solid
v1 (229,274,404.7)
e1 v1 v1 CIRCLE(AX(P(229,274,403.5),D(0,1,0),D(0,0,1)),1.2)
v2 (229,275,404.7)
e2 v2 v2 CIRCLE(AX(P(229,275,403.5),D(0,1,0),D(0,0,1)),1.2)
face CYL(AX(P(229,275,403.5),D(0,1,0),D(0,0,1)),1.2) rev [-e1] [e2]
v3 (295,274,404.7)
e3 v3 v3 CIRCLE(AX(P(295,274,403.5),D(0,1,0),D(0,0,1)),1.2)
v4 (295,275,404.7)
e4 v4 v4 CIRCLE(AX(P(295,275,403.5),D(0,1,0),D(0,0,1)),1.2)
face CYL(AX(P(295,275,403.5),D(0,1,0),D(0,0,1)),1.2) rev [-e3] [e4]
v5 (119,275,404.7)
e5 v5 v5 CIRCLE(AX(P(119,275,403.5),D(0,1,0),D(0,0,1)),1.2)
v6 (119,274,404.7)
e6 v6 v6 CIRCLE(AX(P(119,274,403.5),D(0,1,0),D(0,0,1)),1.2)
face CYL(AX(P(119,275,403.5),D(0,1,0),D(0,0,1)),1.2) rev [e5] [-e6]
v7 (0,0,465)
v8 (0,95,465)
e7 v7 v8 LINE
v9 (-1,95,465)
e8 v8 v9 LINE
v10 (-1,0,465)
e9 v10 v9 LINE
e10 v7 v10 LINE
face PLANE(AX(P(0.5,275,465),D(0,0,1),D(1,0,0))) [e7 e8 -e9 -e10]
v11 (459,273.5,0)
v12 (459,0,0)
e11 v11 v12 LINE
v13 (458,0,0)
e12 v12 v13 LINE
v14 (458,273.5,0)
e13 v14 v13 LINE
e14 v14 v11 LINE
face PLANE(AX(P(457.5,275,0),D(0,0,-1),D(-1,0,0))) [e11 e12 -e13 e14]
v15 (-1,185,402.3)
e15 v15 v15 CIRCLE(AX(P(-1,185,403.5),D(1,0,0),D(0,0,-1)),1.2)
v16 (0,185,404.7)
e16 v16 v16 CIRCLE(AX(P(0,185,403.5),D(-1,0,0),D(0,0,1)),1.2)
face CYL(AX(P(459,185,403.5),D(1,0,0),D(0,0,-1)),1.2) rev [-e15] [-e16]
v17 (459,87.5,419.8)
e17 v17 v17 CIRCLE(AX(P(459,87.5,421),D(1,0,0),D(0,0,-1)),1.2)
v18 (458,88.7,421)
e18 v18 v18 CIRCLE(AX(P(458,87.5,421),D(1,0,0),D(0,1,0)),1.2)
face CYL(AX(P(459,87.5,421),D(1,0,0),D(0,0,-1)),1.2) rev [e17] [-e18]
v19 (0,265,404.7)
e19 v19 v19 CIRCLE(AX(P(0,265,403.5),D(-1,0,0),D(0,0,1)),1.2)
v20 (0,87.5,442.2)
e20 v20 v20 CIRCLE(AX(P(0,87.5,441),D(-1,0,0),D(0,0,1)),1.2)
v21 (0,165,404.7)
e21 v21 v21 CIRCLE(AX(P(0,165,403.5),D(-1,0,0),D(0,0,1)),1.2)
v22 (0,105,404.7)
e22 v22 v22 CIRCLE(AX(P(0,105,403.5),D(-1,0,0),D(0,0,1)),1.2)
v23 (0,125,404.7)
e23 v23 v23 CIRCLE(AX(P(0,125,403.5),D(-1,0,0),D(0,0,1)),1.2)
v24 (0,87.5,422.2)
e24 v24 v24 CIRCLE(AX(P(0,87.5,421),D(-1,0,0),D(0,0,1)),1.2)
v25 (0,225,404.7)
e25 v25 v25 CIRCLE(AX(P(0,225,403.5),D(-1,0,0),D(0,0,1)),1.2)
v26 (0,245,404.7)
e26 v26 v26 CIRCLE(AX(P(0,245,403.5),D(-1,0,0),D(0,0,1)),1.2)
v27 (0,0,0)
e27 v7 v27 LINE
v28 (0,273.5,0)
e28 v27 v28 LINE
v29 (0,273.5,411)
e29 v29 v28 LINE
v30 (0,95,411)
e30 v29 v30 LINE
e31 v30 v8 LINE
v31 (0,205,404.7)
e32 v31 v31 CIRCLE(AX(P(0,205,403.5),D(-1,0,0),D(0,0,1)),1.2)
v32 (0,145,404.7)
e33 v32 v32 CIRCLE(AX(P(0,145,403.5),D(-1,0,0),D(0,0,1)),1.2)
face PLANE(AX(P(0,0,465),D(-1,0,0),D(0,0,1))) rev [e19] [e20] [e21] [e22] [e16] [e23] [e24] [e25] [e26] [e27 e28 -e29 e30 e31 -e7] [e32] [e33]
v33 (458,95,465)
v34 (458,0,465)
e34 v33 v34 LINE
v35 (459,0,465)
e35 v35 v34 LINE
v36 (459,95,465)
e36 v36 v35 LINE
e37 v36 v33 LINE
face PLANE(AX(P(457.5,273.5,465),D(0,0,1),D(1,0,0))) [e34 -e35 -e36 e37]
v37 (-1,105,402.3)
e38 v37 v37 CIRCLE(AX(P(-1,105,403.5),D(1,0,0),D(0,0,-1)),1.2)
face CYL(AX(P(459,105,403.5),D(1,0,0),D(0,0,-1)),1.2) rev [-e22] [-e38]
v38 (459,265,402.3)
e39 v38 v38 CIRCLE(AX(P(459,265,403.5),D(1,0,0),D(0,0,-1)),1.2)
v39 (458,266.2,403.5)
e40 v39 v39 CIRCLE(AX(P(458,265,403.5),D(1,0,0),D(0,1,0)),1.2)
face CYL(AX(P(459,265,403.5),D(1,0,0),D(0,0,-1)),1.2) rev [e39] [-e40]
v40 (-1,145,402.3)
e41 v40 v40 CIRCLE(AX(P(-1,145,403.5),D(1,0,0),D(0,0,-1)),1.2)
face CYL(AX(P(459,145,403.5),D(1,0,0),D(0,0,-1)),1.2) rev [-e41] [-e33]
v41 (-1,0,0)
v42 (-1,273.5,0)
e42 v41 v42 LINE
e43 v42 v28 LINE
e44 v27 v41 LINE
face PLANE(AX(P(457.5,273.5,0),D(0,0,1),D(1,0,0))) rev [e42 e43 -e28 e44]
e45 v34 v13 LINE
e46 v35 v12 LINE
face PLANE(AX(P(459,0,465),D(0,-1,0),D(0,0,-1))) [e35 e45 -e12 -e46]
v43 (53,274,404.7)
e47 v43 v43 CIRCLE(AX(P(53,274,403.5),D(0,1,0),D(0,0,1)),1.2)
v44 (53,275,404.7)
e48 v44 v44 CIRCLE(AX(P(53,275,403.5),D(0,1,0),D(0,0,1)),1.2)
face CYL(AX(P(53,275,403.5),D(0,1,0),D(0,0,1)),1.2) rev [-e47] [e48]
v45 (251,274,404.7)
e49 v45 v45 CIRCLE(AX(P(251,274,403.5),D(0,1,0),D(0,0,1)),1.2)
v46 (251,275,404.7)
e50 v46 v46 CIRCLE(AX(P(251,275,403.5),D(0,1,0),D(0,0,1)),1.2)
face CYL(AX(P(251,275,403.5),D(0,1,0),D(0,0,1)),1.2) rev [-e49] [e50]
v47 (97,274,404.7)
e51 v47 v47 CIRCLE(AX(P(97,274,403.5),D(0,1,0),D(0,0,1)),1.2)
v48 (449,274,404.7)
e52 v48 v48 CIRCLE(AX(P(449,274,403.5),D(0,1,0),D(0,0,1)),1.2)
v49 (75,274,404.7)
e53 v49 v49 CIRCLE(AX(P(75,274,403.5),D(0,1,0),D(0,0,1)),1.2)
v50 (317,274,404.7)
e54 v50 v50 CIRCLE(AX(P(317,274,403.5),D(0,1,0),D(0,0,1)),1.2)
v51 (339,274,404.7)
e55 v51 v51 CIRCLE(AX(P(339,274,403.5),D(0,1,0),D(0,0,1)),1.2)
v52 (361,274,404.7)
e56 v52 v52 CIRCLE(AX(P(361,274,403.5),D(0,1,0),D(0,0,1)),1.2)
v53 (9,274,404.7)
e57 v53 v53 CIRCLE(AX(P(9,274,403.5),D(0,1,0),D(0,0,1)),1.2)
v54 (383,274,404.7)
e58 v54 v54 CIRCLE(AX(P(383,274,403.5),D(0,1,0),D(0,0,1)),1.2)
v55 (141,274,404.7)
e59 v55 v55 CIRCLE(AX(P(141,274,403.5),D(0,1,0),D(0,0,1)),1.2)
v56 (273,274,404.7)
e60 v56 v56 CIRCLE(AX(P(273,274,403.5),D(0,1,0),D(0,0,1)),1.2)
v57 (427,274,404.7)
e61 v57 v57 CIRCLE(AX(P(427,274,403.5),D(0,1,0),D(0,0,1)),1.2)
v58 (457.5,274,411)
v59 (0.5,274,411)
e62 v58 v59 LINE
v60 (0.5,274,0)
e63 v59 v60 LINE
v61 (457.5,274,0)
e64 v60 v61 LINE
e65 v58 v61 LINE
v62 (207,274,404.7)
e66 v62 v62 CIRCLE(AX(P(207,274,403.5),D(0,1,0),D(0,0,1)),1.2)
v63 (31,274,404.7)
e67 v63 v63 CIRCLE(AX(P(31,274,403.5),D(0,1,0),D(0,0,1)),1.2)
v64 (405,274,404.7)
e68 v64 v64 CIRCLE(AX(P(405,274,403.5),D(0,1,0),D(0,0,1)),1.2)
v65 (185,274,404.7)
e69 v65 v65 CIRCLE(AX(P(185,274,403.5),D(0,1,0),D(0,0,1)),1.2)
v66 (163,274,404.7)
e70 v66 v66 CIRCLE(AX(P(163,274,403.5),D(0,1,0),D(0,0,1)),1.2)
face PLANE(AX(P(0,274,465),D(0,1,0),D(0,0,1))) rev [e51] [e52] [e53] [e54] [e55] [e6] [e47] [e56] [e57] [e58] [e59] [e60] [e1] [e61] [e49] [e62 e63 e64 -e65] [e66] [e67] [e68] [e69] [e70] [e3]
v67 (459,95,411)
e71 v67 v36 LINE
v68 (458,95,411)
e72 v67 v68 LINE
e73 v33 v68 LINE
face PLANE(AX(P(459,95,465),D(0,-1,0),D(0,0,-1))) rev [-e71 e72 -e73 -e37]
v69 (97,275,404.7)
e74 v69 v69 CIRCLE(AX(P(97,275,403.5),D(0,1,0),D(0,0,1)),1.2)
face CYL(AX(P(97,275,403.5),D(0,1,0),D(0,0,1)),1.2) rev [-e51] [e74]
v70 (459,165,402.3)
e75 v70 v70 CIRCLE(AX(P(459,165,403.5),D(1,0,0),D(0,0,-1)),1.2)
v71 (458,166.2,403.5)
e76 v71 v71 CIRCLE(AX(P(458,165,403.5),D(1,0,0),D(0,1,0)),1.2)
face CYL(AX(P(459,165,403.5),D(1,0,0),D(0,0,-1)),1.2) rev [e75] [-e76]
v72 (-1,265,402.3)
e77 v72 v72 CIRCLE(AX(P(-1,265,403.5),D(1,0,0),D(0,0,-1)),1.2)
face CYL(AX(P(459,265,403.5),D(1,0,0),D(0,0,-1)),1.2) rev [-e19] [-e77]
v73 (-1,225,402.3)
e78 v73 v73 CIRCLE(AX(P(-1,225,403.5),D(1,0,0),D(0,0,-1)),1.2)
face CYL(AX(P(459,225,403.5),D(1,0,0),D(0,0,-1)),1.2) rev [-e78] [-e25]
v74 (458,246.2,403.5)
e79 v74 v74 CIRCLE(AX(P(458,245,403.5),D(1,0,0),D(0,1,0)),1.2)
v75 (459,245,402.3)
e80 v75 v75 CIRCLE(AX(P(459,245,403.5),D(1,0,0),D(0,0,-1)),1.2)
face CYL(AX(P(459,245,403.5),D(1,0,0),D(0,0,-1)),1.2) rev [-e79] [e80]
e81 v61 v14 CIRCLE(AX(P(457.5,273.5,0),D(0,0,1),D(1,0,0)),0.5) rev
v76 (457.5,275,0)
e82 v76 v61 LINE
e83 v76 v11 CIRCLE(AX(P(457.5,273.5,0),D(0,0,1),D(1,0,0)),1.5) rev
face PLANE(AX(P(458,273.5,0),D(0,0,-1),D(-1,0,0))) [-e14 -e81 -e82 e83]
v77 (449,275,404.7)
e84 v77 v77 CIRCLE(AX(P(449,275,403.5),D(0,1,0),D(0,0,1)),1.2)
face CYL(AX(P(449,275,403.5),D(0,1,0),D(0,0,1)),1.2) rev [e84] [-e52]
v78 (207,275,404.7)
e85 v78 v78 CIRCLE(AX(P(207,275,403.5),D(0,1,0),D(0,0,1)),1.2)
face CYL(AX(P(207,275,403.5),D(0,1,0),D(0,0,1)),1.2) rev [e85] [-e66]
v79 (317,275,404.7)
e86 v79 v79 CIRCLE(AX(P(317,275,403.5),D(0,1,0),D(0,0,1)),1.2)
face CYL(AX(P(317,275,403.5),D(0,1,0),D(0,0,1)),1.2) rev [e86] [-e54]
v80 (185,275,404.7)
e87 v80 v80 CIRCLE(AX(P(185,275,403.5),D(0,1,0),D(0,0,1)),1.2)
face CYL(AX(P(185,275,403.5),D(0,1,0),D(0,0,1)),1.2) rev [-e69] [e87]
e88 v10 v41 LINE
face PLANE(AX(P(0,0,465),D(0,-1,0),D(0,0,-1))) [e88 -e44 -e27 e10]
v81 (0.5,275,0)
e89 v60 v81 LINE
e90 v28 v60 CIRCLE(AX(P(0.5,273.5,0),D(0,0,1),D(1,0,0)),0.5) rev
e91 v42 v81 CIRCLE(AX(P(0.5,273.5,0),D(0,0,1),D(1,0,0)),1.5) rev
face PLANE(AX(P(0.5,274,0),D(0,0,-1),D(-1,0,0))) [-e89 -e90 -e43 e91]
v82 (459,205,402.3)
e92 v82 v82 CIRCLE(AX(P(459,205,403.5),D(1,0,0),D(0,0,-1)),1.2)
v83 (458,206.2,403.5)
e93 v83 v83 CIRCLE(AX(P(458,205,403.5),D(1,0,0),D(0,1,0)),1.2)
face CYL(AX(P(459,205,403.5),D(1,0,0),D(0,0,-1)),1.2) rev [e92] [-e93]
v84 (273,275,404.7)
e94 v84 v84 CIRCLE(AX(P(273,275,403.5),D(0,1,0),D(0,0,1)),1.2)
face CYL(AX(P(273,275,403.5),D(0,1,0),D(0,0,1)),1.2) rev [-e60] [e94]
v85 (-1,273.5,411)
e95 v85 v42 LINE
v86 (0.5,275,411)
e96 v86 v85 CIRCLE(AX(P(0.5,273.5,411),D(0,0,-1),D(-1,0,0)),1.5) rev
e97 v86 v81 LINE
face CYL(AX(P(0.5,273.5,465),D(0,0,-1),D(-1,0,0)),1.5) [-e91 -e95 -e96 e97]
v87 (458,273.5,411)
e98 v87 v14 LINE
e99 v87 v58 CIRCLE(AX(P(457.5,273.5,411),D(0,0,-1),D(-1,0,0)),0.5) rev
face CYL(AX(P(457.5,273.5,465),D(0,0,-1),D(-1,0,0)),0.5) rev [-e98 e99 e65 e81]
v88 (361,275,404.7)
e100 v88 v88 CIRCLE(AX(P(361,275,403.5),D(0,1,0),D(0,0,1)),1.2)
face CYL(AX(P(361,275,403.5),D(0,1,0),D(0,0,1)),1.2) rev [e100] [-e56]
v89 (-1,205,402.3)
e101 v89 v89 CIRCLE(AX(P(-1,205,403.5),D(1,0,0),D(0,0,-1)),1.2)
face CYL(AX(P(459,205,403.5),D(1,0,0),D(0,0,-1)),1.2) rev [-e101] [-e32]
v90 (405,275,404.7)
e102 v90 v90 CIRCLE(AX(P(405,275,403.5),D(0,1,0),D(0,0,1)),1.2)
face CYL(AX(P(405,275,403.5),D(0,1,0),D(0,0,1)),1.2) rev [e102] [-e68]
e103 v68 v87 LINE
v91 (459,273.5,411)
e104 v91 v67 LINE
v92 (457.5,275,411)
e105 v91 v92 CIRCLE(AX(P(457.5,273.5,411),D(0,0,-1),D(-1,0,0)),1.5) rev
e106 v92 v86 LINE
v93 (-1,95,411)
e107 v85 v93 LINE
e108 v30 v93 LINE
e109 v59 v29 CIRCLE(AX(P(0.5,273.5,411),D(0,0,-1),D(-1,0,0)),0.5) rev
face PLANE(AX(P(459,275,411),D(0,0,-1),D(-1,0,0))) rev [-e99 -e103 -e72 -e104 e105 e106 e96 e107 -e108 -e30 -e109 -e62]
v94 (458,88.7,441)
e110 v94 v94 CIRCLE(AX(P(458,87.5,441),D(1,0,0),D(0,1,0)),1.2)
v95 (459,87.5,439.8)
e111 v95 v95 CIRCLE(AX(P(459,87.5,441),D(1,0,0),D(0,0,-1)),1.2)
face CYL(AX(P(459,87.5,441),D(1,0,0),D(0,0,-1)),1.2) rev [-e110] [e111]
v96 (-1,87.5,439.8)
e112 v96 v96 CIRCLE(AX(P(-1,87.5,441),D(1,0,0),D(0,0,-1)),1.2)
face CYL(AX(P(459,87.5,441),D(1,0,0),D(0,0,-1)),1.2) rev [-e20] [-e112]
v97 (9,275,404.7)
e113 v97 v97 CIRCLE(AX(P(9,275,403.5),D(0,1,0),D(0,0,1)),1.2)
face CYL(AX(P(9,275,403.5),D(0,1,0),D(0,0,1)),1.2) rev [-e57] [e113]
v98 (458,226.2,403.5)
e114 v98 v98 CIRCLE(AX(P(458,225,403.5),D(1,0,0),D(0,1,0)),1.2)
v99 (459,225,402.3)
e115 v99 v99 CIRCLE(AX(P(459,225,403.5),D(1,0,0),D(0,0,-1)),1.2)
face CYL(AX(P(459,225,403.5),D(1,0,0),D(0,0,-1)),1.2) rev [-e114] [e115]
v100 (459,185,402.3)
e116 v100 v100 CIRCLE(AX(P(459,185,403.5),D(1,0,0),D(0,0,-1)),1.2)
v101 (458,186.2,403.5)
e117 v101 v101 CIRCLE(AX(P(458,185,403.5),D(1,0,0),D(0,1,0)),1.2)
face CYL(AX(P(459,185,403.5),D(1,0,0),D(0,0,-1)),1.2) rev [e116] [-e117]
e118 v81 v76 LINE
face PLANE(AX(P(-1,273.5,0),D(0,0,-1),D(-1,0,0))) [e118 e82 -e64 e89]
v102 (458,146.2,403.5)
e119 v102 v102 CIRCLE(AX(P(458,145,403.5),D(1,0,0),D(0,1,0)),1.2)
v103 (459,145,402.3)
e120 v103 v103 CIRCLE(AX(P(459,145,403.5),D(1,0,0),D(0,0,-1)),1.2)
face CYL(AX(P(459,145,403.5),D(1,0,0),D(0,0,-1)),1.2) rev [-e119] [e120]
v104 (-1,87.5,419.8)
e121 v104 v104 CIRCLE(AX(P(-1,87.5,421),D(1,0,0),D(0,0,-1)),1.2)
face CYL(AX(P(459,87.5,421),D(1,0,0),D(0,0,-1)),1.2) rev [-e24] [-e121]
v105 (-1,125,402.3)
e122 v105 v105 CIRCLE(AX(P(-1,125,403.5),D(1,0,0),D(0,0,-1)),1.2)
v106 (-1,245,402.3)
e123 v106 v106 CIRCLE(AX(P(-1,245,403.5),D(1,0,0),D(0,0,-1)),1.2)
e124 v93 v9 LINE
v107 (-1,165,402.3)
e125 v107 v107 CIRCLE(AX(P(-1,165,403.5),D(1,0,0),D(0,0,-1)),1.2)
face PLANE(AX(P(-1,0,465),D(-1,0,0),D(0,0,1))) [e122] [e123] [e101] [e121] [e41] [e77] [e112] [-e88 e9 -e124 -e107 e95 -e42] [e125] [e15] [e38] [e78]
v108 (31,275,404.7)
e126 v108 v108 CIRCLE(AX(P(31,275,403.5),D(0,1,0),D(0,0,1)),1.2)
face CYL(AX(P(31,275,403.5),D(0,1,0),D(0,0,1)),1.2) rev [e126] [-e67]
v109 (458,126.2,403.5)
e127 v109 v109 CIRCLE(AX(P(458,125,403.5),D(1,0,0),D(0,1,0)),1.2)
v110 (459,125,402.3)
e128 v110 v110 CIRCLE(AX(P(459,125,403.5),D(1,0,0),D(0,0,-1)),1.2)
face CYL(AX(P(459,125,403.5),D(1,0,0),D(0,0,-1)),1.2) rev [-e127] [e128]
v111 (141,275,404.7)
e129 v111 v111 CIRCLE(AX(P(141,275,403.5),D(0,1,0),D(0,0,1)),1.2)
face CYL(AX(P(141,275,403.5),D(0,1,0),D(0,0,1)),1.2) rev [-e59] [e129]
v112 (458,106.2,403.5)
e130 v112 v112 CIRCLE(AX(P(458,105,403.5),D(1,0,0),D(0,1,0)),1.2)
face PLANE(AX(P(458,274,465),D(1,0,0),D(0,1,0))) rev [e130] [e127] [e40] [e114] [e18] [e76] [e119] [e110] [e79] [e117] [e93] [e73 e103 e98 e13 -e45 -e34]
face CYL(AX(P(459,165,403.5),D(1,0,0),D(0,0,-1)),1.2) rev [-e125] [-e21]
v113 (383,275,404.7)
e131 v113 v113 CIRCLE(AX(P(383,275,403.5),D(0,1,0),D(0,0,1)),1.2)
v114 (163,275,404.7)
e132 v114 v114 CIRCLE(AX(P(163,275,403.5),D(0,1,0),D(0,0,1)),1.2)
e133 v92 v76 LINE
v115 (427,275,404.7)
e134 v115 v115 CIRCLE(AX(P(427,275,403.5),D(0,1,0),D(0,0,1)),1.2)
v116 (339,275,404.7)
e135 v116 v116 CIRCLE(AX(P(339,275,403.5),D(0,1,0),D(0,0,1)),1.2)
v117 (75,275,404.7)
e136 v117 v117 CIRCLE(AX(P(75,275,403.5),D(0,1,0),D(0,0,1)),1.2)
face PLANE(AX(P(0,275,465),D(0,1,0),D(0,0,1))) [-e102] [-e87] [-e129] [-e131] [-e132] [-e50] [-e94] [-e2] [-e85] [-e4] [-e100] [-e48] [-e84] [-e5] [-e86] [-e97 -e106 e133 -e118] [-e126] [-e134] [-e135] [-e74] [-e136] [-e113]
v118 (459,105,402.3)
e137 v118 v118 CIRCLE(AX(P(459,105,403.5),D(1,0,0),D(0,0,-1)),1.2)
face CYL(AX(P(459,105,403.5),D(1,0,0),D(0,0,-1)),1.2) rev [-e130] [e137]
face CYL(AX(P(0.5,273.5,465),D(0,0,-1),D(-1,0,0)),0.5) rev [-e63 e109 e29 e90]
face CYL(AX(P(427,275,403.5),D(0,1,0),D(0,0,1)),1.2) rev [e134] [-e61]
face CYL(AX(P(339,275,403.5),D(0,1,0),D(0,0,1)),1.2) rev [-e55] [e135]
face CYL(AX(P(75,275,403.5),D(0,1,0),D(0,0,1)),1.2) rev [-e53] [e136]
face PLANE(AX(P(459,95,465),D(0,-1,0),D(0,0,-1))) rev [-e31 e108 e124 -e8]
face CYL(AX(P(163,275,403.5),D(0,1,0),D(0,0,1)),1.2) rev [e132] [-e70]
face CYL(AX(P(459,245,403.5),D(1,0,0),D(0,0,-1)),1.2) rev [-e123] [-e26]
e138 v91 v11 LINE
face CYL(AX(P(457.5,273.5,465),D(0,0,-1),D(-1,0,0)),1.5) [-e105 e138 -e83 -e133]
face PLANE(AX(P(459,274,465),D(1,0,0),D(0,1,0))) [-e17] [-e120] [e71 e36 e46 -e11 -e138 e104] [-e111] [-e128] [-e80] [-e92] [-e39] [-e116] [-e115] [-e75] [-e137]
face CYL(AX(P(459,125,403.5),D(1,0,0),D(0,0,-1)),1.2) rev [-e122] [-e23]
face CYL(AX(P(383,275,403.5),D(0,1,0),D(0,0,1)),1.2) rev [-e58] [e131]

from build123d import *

# Parameters (mm, degrees)
SM_BASE_FLANGE_1_DEPTH = 465
SKETCH_4_W             = 54
SKETCH_4_H             = 180
CUT_EXTRUDE_2_DEPTH    = 710.542105868
HOLE_WIZARD_M21_D      = 2.4
HOLE_WIZARD_M21_DEPTH  = 5
HOLE_WIZARD_M21_TIP    = 0.721032743
HOLE_WIZARD_M22_D      = 2.4


# Sheet-metal steps are written as plain solids
with BuildPart() as part:
    # Sketch 1 → Базовая кромка1 (new body)
    with BuildSketch(Plane.XY):
        with BuildLine():
            Line((0, 0), (0, 273.5))
            ThreePointArc((0, 273.5), (0.146446609, 273.853553391), (0.5, 274))
            Line((0.5, 274), (457.5, 274))
            ThreePointArc((457.5, 274), (457.853553391, 273.853553391), (458, 273.5))
            Line((458, 273.5), (458, 0))
            Line((458, 0), (459, 0))
            Line((459, 0), (459, 273.5))
            ThreePointArc((459, 273.5), (458.560660172, 274.560660172), (457.5, 275))
            Line((457.5, 275), (0.5, 275))
            ThreePointArc((0.5, 275), (-0.560660172, 274.560660172), (-1, 273.5))
            Line((-1, 273.5), (-1, 0))
            Line((-1, 0), (0, 0))
        make_face()
    extrude(amount=SM_BASE_FLANGE_1_DEPTH)

    # Эскиз4 → Вырез-Вытянуть2 (cut, through all)
    with BuildSketch(Plane.ZY.offset(1)):
        with Locations((438, 185)):
            Rectangle(SKETCH_4_W, SKETCH_4_H)
    extrude(amount=-CUT_EXTRUDE_2_DEPTH, mode=Mode.SUBTRACT)

    # Отверстие с зазором M21
    with Locations(Plane(origin=(0, 275, 0), x_dir=(-1, 0, 0), z_dir=(0, 1, 0))):
        with Locations((-9, 403.5), (-31, 403.5), (-53, 403.5), (-75, 403.5), (-97, 403.5), (-119, 403.5), (-141, 403.5), (-163, 403.5), (-185, 403.5), (-207, 403.5), (-229, 403.5), (-251, 403.5), (-273, 403.5), (-295, 403.5), (-317, 403.5), (-339, 403.5), (-361, 403.5), (-383, 403.5), (-405, 403.5), (-427, 403.5), (-449, 403.5)):
            Hole(HOLE_WIZARD_M21_D / 2, depth=HOLE_WIZARD_M21_DEPTH)
            with Locations((0, 0, -(HOLE_WIZARD_M21_DEPTH + HOLE_WIZARD_M21_TIP / 2))):  # 118° drill point
                Cone(0, HOLE_WIZARD_M21_D / 2, HOLE_WIZARD_M21_TIP, mode=Mode.SUBTRACT)

    # Отверстие с зазором M22 (through all)
    with Locations(Plane(origin=(459, 0, 0), x_dir=(0, 0, -1), z_dir=(1, 0, 0))):
        with Locations((-403.5, 265), (-403.5, 245), (-403.5, 225), (-403.5, 205), (-403.5, 185), (-403.5, 165), (-403.5, 145), (-403.5, 125), (-403.5, 105), (-421, 87.5), (-441, 87.5)):
            Hole(HOLE_WIZARD_M22_D / 2)


solid = part.part
